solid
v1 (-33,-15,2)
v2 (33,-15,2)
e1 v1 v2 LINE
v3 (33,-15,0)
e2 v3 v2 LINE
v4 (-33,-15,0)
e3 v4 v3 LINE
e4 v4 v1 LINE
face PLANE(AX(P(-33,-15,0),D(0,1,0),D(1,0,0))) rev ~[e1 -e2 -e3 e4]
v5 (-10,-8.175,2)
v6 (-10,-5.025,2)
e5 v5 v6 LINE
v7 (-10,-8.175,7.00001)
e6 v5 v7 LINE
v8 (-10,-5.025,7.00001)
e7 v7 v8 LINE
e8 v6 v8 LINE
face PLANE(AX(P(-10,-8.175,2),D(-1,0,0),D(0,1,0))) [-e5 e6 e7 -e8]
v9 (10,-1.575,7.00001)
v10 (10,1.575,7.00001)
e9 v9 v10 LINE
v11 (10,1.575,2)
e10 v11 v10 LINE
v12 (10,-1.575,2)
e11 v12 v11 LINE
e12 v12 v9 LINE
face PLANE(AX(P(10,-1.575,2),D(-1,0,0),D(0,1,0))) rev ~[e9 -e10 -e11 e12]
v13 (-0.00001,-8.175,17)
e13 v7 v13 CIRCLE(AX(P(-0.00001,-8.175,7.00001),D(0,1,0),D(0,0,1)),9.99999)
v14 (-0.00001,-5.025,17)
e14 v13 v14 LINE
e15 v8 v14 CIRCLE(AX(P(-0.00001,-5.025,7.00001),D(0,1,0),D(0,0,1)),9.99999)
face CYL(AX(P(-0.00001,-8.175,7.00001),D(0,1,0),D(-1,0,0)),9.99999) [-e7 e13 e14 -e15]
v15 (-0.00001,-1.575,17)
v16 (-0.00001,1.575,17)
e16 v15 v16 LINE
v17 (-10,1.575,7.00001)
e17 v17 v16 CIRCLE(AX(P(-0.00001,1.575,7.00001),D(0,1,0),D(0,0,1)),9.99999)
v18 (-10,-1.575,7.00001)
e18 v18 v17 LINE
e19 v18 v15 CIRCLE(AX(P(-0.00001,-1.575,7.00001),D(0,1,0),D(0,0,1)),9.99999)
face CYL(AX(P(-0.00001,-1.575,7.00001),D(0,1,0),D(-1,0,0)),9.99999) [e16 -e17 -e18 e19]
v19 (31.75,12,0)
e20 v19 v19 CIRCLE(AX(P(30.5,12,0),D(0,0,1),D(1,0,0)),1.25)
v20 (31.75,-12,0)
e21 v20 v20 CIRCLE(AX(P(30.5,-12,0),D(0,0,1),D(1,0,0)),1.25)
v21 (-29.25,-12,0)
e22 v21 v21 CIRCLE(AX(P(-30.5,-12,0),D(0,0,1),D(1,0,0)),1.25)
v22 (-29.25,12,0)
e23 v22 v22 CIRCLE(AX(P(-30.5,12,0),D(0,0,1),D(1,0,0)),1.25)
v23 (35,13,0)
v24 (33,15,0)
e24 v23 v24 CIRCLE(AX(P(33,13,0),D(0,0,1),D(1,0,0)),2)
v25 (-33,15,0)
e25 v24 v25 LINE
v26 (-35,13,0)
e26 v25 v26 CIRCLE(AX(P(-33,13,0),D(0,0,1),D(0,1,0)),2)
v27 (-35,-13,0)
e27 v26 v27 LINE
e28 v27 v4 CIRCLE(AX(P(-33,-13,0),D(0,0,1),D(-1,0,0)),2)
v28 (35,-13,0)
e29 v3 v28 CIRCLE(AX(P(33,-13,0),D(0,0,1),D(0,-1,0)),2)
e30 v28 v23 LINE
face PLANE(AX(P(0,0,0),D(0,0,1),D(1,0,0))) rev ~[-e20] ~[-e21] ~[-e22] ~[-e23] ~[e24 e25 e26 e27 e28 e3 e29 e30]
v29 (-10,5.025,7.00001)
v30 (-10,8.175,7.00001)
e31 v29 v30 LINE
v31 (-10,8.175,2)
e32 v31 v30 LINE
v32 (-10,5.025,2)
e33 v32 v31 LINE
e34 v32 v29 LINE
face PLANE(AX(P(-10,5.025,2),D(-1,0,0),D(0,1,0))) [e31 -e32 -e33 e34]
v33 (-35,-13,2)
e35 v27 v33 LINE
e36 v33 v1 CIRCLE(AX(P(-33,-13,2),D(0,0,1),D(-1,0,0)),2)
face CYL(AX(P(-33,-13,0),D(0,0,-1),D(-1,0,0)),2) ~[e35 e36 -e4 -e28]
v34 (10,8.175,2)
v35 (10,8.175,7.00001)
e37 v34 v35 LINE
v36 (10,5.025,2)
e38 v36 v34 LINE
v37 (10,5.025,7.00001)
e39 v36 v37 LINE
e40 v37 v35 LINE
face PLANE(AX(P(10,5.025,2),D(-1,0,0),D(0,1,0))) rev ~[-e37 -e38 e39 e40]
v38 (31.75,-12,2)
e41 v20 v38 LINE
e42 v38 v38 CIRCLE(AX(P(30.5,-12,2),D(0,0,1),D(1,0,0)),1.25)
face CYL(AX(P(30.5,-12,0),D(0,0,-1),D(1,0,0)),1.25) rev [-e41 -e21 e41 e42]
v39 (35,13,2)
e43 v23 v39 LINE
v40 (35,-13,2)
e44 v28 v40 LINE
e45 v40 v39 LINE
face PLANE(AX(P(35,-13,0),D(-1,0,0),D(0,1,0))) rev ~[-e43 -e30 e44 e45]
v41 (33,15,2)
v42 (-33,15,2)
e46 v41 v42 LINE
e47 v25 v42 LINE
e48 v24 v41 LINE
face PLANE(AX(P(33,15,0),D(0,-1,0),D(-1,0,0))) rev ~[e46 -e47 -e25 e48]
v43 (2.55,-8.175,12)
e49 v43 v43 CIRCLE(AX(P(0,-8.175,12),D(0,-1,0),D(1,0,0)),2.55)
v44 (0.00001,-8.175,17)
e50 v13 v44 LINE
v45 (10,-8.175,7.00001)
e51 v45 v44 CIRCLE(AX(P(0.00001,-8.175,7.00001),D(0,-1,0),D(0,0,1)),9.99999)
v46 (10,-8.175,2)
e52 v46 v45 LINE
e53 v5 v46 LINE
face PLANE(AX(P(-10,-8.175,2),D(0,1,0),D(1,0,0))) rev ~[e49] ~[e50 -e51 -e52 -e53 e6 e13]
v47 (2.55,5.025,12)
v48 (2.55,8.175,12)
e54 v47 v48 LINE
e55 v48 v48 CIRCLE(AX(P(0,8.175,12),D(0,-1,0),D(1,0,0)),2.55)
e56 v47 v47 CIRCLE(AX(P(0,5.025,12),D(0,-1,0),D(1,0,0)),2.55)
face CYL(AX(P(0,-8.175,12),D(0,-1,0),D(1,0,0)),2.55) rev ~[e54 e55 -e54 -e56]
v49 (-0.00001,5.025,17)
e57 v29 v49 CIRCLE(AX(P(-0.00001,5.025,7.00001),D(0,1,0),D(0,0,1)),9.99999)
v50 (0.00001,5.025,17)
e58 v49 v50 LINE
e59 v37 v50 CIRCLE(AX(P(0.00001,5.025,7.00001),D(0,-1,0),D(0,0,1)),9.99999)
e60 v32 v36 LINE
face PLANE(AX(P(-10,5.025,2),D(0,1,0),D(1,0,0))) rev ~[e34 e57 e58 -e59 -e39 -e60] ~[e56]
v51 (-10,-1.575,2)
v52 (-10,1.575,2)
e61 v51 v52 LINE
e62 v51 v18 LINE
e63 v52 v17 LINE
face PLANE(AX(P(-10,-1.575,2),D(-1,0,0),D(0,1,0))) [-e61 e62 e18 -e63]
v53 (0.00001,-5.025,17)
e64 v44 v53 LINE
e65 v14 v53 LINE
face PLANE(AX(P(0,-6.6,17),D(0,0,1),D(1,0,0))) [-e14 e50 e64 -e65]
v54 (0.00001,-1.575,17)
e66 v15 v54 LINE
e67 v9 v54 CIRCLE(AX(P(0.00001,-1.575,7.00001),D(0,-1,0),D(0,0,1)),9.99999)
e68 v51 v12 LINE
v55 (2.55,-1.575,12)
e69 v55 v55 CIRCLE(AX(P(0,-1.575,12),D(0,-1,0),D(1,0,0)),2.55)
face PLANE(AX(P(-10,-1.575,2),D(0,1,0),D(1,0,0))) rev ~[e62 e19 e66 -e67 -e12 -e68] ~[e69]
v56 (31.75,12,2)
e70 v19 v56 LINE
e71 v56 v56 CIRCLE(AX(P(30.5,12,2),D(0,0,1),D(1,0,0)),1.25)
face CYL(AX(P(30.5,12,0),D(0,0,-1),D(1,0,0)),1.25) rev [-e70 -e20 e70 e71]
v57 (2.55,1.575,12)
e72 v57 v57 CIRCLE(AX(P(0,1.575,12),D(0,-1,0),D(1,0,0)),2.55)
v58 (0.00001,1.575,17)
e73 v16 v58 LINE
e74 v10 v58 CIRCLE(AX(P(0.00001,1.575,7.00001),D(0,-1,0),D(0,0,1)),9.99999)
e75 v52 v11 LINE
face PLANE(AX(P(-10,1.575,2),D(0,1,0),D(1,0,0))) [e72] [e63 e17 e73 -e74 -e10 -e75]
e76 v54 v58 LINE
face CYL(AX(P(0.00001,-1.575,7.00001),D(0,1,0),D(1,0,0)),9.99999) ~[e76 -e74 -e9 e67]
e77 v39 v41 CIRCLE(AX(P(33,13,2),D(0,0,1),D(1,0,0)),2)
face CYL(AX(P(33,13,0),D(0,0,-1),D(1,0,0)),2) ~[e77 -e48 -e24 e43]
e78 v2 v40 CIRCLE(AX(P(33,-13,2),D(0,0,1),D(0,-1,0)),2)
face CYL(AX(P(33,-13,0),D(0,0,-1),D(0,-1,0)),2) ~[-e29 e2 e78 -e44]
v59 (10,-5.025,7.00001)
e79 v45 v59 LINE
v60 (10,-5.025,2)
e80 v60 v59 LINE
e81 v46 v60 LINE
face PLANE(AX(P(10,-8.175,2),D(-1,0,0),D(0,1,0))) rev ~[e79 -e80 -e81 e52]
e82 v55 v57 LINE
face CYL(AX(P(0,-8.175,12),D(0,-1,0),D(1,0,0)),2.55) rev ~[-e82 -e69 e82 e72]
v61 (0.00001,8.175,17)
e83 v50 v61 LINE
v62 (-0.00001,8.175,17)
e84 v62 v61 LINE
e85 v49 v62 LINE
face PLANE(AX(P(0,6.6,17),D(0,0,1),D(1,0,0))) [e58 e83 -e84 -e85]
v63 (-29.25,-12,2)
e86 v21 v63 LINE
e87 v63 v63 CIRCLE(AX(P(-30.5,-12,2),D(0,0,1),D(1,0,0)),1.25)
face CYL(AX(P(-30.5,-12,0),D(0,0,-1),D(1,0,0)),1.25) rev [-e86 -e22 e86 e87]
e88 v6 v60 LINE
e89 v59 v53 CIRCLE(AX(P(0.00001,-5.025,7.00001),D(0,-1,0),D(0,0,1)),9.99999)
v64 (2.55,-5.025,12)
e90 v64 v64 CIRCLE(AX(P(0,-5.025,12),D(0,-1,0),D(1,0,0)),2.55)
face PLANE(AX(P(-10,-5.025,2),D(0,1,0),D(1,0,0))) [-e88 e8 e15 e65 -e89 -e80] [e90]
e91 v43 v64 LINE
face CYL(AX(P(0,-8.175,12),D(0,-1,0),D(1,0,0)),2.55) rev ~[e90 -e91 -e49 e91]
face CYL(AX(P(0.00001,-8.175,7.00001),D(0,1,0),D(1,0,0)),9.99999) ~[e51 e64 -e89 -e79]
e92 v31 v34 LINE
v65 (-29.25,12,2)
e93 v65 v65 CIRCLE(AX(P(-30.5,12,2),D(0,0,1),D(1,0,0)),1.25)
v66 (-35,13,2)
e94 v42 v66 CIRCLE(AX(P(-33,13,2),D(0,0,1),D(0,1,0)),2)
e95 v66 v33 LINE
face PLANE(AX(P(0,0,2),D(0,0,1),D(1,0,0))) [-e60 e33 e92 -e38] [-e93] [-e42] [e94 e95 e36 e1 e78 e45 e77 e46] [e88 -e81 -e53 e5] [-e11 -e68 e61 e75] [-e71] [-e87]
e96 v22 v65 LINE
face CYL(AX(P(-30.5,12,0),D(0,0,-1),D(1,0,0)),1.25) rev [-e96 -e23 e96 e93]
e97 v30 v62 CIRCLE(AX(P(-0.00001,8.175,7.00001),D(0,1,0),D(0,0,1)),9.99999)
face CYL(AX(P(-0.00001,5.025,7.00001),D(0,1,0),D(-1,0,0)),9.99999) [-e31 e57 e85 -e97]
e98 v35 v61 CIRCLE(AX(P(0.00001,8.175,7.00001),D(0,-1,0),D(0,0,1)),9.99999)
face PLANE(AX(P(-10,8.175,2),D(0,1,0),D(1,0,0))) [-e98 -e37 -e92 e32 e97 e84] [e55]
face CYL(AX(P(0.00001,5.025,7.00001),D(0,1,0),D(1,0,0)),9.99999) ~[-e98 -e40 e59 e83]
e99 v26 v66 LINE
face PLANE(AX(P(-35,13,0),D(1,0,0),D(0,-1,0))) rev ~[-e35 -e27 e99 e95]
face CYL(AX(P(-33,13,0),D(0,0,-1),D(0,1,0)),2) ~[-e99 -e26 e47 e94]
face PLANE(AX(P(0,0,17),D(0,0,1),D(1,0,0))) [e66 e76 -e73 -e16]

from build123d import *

# Parameters (mm, degrees)
F0_R     = 1.25
F1_DEPTH = 2
F2_W     = 20
F2_H     = 3.15
F3_DEPTH = 15
F4_R     = 9.99999
F5_R     = 2.55
F6_DEPTH = 25


# Not quite as in the source:
# - a fillet or chamfer is up to 0.001 mm smaller than in the source, because OpenCascade refuses the exact size


with BuildPart() as f1:
    # F0 (on Top) → F1 (new body)
    with BuildSketch(Plane.XY):
        with BuildLine():
            Line((-33, -15), (33, -15))
            ThreePointArc((33, -15), (34.4142135624, -14.4142135624), (35, -13))
            Line((35, -13), (35, 13))
            ThreePointArc((35, 13), (34.4142135624, 14.4142135624), (33, 15))
            Line((33, 15), (-33, 15))
            ThreePointArc((-33, 15), (-34.4142135624, 14.4142135624), (-35, 13))
            Line((-35, 13), (-35, -13))
            ThreePointArc((-35, -13), (-34.4142135624, -14.4142135624), (-33, -15))
        make_face()
        with Locations((-30.5, -12)):
            Circle(F0_R, mode=Mode.SUBTRACT)
        with Locations((30.5, -12)):
            Circle(F0_R, mode=Mode.SUBTRACT)
        with Locations((-30.5, 12)):
            Circle(F0_R, mode=Mode.SUBTRACT)
        with Locations((30.5, 12)):
            Circle(F0_R, mode=Mode.SUBTRACT)
    extrude(amount=F1_DEPTH)

    # F2 (on face) → F3 (join)
    with BuildSketch(Plane.XY.offset(2)):
        Rectangle(F2_W, F2_H)
        with Locations((0, 6.6)):
            Rectangle(F2_W, F2_H)
        with Locations((0, -6.6)):
            Rectangle(F2_W, F2_H)
    extrude(amount=F3_DEPTH)

    # F4 (radius 10 in the source; OpenCascade refuses exactly that, so slightly less here)
    f4_edges = [f1.edges().sort_by_distance(p)[0] for p in [
        (-10, -6.6, 17),
        (10, -6.6, 17),
        (10, 0, 17),
        (-10, 0, 17),
        (-10, 6.6, 17),
        (10, 6.6, 17),
    ]]
    fillet(f4_edges, radius=F4_R)

    # F5 (on face) → F6 (cut)
    with BuildSketch(Plane.XZ.offset(8.175)):
        with Locations((0, 12)):
            Circle(F5_R)
    extrude(amount=-F6_DEPTH, mode=Mode.SUBTRACT)


solid = f1.part
